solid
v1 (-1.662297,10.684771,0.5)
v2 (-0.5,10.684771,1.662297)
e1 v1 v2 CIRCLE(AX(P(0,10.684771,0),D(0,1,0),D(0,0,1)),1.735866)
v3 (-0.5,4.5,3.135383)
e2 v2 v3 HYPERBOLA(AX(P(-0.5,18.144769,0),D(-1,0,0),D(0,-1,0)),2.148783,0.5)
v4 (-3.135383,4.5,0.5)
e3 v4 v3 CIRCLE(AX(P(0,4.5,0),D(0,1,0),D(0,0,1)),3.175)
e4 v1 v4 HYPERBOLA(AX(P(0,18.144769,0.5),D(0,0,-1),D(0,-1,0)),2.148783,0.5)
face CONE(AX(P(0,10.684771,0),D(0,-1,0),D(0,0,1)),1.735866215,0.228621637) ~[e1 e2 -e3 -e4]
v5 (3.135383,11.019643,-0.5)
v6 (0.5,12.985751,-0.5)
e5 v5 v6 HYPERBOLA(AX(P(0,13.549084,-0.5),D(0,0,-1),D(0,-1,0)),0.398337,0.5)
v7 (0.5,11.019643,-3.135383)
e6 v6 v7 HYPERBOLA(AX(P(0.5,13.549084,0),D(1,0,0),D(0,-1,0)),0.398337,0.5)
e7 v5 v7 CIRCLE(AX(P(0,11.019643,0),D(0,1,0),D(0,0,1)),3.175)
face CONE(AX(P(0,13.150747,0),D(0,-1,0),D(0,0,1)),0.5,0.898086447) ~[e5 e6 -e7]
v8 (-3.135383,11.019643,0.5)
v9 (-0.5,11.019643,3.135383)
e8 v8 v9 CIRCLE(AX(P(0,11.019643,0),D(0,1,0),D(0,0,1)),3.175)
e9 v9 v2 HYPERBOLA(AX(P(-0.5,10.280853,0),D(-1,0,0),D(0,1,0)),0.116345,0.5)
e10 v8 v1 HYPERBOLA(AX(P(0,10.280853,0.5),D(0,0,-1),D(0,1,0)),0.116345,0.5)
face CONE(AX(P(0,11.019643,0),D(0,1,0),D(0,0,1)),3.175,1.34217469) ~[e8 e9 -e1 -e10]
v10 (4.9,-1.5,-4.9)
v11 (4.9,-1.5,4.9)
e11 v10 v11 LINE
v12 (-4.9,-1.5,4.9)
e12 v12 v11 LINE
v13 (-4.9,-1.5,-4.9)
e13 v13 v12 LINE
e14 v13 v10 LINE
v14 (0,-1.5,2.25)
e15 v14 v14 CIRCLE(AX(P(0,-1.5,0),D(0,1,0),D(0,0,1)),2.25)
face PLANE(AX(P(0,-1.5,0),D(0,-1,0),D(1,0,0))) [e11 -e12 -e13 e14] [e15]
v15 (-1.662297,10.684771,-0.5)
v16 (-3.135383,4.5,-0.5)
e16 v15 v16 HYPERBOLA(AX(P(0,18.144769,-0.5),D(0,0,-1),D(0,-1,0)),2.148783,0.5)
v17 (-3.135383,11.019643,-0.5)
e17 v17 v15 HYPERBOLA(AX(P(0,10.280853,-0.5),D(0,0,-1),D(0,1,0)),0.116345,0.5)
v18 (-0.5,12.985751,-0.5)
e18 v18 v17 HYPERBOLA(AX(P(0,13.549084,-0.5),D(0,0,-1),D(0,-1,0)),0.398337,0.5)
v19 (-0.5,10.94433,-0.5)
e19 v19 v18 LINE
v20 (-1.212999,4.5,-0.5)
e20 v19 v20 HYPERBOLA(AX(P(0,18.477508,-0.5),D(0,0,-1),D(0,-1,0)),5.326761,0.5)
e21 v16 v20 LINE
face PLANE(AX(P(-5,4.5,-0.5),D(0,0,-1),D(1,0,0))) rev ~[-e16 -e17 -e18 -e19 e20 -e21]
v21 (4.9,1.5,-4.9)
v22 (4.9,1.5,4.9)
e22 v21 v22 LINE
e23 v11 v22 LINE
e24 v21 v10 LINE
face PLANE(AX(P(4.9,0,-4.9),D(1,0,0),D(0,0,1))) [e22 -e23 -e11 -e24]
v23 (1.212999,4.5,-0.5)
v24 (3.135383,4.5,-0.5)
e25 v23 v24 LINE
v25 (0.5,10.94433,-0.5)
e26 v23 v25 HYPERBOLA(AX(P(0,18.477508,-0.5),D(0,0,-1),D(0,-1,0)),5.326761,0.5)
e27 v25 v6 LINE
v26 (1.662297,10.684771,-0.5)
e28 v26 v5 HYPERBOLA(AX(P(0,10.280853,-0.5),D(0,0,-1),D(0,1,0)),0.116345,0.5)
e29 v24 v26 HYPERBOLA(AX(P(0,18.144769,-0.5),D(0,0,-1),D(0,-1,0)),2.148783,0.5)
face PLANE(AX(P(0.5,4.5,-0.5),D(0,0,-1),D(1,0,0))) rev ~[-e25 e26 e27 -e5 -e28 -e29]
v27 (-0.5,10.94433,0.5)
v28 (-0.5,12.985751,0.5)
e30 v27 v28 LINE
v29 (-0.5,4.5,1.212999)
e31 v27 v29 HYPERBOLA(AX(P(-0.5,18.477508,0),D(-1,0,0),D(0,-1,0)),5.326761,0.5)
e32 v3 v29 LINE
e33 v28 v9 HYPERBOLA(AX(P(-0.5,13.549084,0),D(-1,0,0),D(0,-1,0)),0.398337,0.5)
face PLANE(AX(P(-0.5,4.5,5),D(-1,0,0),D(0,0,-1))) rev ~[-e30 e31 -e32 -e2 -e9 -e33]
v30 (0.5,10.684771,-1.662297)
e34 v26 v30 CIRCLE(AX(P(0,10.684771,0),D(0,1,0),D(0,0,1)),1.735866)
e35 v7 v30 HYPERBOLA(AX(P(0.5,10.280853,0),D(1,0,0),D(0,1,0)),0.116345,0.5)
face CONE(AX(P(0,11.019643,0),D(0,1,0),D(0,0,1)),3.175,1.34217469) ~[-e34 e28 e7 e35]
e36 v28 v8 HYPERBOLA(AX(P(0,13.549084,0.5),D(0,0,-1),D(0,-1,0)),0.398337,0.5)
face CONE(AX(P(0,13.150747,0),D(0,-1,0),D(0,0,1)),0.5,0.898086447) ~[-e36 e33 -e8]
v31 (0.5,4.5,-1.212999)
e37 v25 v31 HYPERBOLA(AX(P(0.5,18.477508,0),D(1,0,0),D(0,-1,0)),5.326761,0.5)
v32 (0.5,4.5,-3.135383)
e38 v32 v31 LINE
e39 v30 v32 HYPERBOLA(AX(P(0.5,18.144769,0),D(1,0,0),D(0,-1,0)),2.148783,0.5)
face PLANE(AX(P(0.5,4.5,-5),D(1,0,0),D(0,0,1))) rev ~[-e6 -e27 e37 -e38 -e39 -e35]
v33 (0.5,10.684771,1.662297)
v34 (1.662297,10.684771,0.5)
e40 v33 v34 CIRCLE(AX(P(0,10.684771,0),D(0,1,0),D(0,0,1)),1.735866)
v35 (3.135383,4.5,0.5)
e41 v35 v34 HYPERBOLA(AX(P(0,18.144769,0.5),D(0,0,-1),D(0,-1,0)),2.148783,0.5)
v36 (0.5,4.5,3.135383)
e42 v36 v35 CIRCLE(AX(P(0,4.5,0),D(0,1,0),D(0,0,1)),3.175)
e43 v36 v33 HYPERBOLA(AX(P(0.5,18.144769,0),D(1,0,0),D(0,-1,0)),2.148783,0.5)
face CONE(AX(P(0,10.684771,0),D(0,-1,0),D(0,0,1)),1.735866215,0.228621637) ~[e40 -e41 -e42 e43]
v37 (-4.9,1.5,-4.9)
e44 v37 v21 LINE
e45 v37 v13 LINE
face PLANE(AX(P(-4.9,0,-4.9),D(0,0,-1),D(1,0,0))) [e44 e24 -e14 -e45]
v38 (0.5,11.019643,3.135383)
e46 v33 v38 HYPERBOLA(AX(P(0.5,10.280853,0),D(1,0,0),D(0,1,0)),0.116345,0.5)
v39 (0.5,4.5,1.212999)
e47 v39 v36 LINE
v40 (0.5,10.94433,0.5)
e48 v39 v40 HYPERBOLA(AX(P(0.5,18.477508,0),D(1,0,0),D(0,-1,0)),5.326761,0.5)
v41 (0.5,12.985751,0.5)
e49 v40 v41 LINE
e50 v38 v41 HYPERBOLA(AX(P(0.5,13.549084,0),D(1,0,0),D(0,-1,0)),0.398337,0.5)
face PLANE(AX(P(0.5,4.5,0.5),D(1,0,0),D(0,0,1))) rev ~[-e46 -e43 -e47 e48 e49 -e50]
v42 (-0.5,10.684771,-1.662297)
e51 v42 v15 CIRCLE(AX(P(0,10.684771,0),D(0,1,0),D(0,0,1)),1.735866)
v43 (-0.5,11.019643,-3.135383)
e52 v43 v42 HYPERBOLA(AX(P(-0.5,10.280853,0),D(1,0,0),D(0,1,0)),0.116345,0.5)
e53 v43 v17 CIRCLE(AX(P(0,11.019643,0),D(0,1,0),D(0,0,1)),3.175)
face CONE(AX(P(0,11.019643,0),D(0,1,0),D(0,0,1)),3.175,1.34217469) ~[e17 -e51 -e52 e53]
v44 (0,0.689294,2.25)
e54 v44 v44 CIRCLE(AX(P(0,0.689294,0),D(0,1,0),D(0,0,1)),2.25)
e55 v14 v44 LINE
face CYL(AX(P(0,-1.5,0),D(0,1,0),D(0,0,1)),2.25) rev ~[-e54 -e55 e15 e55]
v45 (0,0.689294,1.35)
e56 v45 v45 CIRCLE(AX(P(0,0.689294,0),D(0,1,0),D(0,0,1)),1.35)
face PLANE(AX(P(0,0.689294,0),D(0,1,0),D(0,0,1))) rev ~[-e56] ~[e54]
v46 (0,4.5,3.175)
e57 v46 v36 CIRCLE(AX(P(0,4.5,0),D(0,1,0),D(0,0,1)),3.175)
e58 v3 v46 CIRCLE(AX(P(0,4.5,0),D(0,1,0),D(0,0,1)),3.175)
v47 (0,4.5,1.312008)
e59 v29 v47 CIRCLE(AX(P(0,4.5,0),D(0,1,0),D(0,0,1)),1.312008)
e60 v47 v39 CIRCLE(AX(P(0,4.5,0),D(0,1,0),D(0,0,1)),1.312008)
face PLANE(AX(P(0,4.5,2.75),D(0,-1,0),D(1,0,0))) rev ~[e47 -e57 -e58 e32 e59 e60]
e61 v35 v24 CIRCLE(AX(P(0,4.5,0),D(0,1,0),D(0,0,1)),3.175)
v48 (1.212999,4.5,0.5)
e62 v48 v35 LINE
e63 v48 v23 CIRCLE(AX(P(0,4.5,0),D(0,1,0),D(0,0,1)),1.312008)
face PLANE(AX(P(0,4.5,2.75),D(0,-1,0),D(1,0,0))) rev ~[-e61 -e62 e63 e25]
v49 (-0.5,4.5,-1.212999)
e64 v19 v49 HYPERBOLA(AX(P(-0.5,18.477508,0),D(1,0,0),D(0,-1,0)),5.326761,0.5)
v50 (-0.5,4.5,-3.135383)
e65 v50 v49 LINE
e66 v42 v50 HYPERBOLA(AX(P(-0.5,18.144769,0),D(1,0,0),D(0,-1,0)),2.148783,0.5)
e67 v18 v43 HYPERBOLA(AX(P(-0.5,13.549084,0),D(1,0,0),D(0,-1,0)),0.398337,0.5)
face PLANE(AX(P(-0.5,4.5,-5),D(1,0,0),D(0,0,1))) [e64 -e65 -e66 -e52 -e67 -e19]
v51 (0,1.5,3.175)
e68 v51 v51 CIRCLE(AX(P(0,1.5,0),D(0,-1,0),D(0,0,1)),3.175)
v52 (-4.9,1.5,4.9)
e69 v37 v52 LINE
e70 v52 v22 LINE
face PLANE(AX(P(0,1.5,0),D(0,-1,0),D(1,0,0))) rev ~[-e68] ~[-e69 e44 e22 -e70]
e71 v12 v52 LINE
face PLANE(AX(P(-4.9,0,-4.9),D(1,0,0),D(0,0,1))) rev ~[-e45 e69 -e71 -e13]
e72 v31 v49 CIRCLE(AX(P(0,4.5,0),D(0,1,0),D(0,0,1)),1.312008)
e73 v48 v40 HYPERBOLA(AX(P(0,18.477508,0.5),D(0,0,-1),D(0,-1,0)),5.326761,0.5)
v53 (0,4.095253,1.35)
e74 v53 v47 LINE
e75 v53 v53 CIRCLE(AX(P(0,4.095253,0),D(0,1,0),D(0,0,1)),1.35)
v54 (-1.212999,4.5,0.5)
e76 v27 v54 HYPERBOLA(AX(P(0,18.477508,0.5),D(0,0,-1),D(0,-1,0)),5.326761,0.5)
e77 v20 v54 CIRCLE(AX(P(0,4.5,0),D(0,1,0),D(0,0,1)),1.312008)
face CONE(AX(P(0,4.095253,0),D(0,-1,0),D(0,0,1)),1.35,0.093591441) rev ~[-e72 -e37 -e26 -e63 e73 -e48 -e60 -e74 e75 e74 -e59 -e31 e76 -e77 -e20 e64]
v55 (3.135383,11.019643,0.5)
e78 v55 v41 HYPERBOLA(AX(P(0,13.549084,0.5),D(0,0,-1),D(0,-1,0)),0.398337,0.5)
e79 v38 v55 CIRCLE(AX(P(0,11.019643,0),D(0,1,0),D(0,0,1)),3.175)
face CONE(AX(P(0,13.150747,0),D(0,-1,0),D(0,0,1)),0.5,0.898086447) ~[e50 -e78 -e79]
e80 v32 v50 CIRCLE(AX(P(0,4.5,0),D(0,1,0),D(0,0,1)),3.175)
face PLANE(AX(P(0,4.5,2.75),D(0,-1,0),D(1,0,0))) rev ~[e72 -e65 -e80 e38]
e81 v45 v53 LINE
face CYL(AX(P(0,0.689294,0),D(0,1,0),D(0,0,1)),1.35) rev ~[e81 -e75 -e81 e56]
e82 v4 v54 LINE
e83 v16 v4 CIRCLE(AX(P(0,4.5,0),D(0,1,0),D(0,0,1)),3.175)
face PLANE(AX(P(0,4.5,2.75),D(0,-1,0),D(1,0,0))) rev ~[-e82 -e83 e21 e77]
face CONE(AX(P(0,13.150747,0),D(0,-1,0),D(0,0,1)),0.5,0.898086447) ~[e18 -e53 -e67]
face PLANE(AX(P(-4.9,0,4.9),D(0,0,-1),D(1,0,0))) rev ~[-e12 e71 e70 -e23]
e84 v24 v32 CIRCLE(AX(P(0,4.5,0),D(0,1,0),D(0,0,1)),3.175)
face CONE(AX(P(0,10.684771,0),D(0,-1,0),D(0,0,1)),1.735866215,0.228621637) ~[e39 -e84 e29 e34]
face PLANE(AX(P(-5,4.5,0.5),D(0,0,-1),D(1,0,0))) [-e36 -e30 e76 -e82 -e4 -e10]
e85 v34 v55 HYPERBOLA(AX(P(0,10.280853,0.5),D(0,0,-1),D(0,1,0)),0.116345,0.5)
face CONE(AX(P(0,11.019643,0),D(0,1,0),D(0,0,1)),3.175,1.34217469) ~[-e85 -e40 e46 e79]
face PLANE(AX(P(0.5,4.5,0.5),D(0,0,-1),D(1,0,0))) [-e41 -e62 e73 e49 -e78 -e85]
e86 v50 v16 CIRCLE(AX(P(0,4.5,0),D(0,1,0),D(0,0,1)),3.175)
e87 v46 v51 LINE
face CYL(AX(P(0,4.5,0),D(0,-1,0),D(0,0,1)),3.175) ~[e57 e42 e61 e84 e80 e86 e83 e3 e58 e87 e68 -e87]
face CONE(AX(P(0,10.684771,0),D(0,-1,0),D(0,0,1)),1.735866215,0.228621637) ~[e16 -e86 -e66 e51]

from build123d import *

# Parameters (mm, degrees)
F0_W     = 9.8
F0_H     = 9.8
F0_R     = 2.75
F3_DEPTH = 1.5
F5_START = -4.5
F4_W     = 1
F4_H     = 4.5
F4_H_2   = 1
F4_W_2   = 4.5
F5_DEPTH = 20.5


# Not quite as in the source:
# - a feature names something its author has since deleted; it is built from what else it names


with BuildPart() as f2:
    # F1 (on Right) → F2 (revolve)
    with BuildSketch(Plane.YZ):
        Polygon((4.5, 3.175), (-1.5, 3.175), (-1.5, 2.25), (0.6892941068, 2.25), (0.6892941068, 1.35), (4.0952532458, 1.35), (13.1507472004, 0.5), (11.0196430301, 3.175), (10.6847711314, 1.7358662147), align=None)
    revolve(axis=Axis((0, 11.4737532458, 0), (0, 1, 0)))

    # F0 (on Front) → F3 (join, symmetric)
    with BuildSketch(Plane.XZ):
        Rectangle(F0_W, F0_H)
        Circle(F0_R, mode=Mode.SUBTRACT)
    extrude(amount=F3_DEPTH, both=True)

    # F4 (on Front) → F5 (cut)
    with BuildSketch(Plane.XZ.offset(F5_START)):
        with Locations((0, 2.75)):
            Rectangle(F4_W, F4_H)
        Rectangle(F4_W, F4_H_2)
        with Locations((-2.75, 0)):
            Rectangle(F4_W_2, F4_H_2)
        with Locations((2.75, 0)):
            Rectangle(F4_W_2, F4_H_2)
        with Locations((0, -2.75)):
            Rectangle(F4_W, F4_H)
    extrude(amount=-F5_DEPTH, mode=Mode.SUBTRACT)


solid = f2.part
